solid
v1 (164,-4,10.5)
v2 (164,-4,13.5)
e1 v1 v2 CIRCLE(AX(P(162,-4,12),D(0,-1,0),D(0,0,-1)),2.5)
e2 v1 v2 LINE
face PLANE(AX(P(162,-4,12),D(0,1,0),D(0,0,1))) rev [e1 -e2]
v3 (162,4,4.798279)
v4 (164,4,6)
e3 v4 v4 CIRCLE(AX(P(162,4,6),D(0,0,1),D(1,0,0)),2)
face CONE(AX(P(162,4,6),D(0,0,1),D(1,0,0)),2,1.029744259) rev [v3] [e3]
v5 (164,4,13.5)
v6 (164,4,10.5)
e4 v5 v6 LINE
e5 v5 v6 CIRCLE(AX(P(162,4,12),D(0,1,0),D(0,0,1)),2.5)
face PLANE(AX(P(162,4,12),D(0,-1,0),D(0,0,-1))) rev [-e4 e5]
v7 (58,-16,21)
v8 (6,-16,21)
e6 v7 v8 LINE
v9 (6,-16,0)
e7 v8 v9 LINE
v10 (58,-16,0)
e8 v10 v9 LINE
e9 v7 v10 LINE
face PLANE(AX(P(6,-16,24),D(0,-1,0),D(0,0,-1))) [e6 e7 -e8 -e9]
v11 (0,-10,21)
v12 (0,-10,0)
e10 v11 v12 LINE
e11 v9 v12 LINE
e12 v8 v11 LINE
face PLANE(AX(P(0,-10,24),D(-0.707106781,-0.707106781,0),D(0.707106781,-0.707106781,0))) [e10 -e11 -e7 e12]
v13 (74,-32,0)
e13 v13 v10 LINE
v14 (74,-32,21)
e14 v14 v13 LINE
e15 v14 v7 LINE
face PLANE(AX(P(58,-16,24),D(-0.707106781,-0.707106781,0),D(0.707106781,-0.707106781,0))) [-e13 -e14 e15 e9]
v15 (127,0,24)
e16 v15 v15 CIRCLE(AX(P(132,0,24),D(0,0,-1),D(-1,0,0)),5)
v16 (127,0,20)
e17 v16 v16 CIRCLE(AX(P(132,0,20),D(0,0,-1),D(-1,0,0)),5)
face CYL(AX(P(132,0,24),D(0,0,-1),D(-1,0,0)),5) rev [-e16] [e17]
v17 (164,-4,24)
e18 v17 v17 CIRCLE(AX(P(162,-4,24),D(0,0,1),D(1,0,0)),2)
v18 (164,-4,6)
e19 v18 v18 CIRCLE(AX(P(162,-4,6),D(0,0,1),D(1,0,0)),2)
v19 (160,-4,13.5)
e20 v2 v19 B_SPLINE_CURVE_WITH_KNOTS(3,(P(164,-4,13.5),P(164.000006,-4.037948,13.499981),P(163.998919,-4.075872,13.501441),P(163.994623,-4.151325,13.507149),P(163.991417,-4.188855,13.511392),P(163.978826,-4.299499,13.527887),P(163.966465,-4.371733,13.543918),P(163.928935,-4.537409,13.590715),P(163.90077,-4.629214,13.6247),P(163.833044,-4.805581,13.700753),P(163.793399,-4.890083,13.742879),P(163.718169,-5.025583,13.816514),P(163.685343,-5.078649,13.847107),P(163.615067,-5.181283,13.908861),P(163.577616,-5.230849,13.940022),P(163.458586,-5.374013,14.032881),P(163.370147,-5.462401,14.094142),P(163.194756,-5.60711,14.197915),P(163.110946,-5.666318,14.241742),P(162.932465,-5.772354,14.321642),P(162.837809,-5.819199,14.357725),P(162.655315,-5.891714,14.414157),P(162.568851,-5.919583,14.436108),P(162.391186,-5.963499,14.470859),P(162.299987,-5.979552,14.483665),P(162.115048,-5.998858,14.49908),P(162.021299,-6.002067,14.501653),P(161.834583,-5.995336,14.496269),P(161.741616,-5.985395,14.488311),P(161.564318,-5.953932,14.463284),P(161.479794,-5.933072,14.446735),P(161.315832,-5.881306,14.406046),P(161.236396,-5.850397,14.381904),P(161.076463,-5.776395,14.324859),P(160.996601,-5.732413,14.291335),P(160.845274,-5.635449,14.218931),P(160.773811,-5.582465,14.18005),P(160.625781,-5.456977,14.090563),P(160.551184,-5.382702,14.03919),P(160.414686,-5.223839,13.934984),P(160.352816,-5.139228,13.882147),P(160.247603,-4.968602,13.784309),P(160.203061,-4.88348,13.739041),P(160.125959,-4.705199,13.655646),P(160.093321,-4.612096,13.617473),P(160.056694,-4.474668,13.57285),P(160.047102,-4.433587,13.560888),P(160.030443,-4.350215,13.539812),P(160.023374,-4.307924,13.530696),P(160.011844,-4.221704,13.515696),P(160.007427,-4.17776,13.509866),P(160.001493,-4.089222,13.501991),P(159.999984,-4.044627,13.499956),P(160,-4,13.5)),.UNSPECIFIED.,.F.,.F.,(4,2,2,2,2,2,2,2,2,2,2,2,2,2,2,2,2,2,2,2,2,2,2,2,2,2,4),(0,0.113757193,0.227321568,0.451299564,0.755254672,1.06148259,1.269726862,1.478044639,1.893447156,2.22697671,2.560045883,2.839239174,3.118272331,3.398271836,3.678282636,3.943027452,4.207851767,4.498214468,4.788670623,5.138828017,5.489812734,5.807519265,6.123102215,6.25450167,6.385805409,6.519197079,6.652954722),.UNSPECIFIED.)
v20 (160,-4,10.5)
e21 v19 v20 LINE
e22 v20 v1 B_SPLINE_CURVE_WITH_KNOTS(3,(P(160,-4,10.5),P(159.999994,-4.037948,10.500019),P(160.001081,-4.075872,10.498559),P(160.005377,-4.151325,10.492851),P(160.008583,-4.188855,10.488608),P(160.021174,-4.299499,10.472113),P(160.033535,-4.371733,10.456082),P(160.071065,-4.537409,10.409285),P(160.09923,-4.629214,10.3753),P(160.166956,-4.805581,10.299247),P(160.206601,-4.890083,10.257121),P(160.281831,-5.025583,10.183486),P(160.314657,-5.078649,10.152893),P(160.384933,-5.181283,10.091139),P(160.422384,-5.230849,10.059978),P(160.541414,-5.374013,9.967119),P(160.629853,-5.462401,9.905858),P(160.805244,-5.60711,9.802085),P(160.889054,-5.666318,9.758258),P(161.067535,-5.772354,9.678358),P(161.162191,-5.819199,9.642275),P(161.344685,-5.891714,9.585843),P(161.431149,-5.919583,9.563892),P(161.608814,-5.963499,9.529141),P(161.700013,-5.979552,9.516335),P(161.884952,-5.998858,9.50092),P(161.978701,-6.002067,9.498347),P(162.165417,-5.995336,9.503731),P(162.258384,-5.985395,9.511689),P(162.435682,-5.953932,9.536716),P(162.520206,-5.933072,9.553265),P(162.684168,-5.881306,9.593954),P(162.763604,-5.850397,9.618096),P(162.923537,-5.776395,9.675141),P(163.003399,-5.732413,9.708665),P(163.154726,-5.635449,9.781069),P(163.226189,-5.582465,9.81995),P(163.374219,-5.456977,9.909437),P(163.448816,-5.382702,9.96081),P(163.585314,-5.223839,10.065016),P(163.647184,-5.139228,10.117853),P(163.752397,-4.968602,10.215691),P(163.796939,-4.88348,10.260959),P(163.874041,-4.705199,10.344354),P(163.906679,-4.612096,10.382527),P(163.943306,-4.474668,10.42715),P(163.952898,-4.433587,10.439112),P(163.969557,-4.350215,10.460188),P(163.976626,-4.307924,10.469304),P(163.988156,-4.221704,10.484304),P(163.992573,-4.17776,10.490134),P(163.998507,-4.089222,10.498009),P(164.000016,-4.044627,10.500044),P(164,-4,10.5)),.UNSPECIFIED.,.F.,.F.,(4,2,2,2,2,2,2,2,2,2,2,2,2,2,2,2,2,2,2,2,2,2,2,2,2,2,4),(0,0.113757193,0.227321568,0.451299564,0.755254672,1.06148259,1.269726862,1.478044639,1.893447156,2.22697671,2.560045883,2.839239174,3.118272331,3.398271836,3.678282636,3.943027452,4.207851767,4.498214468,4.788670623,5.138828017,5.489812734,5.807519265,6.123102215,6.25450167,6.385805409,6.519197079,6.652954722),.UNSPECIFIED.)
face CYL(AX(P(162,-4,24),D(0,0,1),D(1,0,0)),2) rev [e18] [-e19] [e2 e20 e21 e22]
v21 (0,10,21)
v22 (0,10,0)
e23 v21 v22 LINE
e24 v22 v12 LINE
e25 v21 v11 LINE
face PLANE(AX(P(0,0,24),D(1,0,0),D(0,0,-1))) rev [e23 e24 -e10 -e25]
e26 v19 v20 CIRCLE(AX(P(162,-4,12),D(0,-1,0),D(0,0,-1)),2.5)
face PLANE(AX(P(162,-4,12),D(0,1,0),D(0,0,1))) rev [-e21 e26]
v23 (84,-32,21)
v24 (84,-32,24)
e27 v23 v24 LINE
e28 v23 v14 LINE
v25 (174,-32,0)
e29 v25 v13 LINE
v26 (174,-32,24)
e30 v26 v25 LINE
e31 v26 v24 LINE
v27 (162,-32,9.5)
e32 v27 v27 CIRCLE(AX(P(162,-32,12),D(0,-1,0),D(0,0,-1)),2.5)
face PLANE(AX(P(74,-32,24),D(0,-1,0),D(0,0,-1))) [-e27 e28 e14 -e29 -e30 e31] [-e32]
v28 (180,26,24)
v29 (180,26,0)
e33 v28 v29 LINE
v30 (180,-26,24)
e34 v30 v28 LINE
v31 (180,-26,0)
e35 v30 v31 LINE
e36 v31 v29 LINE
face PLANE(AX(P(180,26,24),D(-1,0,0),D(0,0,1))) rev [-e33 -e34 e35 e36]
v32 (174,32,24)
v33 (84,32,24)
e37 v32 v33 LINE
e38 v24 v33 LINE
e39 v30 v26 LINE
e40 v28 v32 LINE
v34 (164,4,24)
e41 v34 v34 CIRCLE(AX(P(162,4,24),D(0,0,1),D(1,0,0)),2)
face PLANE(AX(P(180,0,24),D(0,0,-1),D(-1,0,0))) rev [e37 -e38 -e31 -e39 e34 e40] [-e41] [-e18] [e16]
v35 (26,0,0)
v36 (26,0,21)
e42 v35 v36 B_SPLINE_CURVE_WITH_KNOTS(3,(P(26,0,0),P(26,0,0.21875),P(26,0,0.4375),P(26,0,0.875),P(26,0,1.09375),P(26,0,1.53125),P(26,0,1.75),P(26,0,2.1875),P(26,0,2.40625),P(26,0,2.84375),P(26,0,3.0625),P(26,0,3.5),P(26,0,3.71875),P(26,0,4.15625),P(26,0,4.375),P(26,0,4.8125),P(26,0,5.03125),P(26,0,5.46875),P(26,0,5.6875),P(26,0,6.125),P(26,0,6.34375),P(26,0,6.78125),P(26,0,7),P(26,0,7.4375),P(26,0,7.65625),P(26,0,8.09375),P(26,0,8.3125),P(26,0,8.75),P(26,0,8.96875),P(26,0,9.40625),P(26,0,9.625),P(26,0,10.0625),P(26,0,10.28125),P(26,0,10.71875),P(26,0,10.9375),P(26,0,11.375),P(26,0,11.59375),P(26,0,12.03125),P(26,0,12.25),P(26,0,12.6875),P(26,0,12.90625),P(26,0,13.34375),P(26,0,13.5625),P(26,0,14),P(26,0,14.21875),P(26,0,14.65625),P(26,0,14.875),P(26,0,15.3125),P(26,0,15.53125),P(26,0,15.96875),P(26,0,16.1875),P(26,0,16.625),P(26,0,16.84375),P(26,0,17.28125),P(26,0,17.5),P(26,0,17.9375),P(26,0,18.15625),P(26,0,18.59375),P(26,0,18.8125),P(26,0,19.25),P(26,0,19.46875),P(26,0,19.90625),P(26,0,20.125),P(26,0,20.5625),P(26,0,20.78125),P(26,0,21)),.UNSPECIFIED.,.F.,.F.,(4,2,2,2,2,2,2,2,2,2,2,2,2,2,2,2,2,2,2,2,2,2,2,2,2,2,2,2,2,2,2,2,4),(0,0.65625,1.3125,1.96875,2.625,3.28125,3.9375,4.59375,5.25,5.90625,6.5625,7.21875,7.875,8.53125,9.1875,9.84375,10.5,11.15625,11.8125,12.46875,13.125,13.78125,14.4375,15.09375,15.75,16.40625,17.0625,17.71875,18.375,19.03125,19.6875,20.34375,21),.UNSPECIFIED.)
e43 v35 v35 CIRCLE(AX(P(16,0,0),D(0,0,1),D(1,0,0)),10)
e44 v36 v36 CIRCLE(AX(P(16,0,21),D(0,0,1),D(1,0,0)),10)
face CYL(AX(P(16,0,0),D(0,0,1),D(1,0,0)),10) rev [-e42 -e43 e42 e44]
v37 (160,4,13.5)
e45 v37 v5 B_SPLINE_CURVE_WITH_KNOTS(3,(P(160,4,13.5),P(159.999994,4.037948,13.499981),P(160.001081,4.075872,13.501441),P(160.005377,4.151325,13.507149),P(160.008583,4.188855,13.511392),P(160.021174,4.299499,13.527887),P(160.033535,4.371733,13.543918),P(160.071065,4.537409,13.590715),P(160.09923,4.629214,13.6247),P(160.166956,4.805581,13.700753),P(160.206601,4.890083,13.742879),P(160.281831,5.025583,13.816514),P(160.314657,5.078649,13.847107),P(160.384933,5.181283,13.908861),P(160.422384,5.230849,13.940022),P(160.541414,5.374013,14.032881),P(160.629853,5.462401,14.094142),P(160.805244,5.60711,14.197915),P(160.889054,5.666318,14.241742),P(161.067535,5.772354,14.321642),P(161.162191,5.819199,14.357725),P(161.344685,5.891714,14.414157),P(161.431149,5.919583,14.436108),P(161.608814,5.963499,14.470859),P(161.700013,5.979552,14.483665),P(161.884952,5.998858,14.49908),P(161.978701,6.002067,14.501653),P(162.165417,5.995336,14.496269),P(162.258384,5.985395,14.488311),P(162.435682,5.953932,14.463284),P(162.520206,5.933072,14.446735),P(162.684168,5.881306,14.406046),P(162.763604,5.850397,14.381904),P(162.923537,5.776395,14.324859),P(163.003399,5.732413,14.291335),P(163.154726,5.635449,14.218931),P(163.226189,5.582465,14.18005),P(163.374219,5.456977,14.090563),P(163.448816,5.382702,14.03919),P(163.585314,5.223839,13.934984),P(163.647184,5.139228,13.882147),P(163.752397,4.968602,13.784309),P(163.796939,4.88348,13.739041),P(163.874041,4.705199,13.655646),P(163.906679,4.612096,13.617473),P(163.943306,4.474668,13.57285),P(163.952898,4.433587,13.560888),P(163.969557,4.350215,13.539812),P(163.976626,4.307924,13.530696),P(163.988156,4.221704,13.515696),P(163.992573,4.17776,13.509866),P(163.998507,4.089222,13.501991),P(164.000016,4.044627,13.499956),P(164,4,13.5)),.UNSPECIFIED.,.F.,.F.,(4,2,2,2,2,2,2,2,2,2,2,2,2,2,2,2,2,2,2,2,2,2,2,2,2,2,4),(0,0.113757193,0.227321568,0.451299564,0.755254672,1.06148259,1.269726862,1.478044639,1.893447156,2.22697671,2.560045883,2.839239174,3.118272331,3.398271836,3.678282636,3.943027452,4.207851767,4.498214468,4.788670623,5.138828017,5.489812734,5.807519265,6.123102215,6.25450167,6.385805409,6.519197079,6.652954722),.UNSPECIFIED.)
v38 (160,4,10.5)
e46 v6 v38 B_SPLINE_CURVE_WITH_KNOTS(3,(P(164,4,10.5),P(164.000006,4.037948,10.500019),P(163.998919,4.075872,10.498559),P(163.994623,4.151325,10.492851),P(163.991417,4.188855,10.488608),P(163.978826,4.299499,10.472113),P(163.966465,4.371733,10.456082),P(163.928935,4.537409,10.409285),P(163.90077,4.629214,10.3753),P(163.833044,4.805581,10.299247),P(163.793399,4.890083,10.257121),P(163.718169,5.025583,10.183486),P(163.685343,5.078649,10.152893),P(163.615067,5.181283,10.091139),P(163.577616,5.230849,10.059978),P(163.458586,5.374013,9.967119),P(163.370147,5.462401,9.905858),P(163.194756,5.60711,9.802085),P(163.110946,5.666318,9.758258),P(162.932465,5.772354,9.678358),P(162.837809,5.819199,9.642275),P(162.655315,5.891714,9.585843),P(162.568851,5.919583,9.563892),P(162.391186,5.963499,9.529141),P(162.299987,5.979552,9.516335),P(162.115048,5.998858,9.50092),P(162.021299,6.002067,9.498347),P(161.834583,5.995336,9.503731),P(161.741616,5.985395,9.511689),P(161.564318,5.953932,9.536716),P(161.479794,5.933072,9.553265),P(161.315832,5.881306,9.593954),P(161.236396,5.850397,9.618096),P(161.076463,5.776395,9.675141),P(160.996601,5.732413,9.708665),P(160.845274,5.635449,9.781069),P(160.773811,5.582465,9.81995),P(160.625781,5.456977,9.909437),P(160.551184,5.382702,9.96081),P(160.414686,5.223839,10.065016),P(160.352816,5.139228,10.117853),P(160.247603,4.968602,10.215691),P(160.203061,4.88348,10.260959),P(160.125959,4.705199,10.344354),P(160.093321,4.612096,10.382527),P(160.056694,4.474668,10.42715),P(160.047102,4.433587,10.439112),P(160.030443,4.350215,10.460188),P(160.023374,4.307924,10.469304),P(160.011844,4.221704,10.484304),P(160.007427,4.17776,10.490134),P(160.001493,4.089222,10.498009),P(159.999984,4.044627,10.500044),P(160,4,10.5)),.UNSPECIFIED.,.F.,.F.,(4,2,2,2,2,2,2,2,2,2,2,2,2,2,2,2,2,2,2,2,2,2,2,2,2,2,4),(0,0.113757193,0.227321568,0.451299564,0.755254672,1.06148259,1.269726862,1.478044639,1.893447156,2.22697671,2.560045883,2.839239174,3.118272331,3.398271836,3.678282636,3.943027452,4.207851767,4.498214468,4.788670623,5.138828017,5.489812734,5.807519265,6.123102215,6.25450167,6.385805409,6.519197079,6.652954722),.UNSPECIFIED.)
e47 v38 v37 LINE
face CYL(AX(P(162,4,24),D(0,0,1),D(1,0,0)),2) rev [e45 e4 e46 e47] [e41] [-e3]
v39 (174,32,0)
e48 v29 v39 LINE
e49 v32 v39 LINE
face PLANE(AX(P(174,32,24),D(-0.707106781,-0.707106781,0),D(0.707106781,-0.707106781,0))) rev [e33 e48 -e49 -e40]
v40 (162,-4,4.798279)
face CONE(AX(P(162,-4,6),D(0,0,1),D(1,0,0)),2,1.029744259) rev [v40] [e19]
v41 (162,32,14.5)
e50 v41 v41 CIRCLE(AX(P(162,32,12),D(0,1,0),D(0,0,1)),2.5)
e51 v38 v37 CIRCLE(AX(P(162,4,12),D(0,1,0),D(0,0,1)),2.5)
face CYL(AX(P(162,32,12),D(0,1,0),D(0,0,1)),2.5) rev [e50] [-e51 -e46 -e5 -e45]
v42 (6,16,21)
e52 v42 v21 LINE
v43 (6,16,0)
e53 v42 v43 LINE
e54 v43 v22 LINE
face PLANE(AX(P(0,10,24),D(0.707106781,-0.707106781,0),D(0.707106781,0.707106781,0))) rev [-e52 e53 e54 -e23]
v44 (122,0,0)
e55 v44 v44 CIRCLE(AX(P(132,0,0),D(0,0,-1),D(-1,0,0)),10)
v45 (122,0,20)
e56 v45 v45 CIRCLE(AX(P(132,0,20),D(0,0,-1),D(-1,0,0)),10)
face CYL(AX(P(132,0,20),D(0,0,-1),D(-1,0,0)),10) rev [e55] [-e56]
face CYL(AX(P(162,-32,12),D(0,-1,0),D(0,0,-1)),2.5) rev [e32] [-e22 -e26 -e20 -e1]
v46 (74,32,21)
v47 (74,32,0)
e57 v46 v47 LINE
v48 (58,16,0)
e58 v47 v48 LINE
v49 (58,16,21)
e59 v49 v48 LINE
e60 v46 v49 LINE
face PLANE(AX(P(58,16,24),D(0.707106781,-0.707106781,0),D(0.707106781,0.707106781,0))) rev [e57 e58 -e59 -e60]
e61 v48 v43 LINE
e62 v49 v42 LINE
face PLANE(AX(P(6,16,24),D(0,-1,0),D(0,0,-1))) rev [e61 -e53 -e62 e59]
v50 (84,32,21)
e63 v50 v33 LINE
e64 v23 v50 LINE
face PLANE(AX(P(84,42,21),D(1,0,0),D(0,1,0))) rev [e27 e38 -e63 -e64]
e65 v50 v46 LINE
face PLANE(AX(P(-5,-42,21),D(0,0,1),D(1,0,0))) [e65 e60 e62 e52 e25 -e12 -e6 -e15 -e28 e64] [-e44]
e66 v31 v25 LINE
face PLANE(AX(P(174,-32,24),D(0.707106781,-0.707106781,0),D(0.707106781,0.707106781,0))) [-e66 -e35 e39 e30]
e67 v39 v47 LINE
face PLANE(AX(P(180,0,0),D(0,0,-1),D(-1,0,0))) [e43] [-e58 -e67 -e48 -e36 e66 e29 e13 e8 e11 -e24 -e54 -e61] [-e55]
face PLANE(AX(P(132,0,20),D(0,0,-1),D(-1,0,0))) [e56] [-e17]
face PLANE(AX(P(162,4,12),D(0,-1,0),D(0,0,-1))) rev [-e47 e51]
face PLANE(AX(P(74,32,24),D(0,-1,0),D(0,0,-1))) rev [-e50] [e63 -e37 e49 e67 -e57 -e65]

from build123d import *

# Parameters (mm, degrees)
BOSS_EXTRU_1_DEPTH        = 24
TROU_START                = 4
TROU_TARAUD_M61_OUTLINE_R = 2.5
TROU_TARAUD_M61_DEPTH     = 28
ESQUISSE2_W               = 89
ESQUISSE2_H               = 84
ENL_V_MAT_EXTRU_1_DEPTH   = 3
ESQUISSE3_R               = 10
ENL_V_MAT_EXTRU_2_DEPTH   = 185.024454914
ESQUISSE9_R               = 10
ENL_V_MAT_EXTRU_3_DEPTH   = 20
ESQUISSE10_R              = 5
ENL_V_MAT_EXTRU_4_DEPTH   = 184.913022939


# Read off the part's stored shape, not the designer's step: Trou taraudé M61
with BuildPart() as part:
    # Esquisse1 → Boss.-Extru.1 (new body)
    with BuildSketch(Plane.XY):
        Polygon((0, 0), (0, 10), (6, 16), (58, 16), (74, 32), (174, 32), (180, 26), (180, 0), align=None)
    boss_extru_1 = extrude(amount=BOSS_EXTRU_1_DEPTH)

    # Esquisse5 → Dégagement M11 (revolve, cut)
    with BuildSketch(Plane(origin=(162, 4, 24), x_dir=(0, -1, 0), z_dir=(1, 0, 0))):
        Polygon((0, 0), (0, 19.201721238), (2, 18), (2, 0), align=None)
    d_gagement_m11 = revolve(axis=Axis((162, 4, 30.35), (0, 0, -1)), mode=Mode.SUBTRACT)

    # Trou taraudé M61 outline → Trou taraudé M61 (cut)
    with BuildSketch(Plane(origin=(0, 0, 0), x_dir=(1, 0, 0), z_dir=(0, 1, 0)).offset(TROU_START)):
        with Locations((162, -12)):
            Circle(TROU_TARAUD_M61_OUTLINE_R)
    trou_taraud_m61 = extrude(amount=TROU_TARAUD_M61_DEPTH, mode=Mode.SUBTRACT)

    # Symétrie1: Boss.-Extru.1, Dégagement M11, Trou taraudé M61 across Top Plane
    add(boss_extru_1.mirror(Plane(origin=(0, 0, 0), x_dir=(1, 0, 0), z_dir=(0, 1, 0))))
    add(d_gagement_m11.mirror(Plane(origin=(0, 0, 0), x_dir=(1, 0, 0), z_dir=(0, 1, 0))), mode=Mode.SUBTRACT)
    add(trou_taraud_m61.mirror(Plane(origin=(0, 0, 0), x_dir=(1, 0, 0), z_dir=(0, 1, 0))), mode=Mode.SUBTRACT)

    # Esquisse2 → Enlèv. mat.-Extru.1 (cut)
    with BuildSketch(Plane.XY.offset(24)):
        with Locations((39.5, 0)):
            Rectangle(ESQUISSE2_W, ESQUISSE2_H)
    extrude(amount=-ENL_V_MAT_EXTRU_1_DEPTH, mode=Mode.SUBTRACT)

    # Esquisse3 → Enlèv. mat.-Extru.2 (cut, through all)
    with BuildSketch(Plane.XY.offset(21)):
        with Locations((16, 0)):
            Circle(ESQUISSE3_R)
    extrude(amount=-ENL_V_MAT_EXTRU_2_DEPTH, mode=Mode.SUBTRACT)

    # Esquisse9 → Enlèv. mat.-Extru.3 (cut)
    with BuildSketch(Plane(origin=(0, 0, 0), x_dir=(-1, 0, 0), z_dir=(0, 0, -1))):
        with Locations((-132, 0)):
            Circle(ESQUISSE9_R)
    extrude(amount=-ENL_V_MAT_EXTRU_3_DEPTH, mode=Mode.SUBTRACT)

    # Esquisse10 → Enlèv. mat.-Extru.4 (cut, through all)
    with BuildSketch(Plane(origin=(0, 0, 20), x_dir=(-1, 0, 0), z_dir=(0, 0, -1))):
        with Locations((-132, 0)):
            Circle(ESQUISSE10_R)
    extrude(amount=-ENL_V_MAT_EXTRU_4_DEPTH, mode=Mode.SUBTRACT)


solid = part.part
